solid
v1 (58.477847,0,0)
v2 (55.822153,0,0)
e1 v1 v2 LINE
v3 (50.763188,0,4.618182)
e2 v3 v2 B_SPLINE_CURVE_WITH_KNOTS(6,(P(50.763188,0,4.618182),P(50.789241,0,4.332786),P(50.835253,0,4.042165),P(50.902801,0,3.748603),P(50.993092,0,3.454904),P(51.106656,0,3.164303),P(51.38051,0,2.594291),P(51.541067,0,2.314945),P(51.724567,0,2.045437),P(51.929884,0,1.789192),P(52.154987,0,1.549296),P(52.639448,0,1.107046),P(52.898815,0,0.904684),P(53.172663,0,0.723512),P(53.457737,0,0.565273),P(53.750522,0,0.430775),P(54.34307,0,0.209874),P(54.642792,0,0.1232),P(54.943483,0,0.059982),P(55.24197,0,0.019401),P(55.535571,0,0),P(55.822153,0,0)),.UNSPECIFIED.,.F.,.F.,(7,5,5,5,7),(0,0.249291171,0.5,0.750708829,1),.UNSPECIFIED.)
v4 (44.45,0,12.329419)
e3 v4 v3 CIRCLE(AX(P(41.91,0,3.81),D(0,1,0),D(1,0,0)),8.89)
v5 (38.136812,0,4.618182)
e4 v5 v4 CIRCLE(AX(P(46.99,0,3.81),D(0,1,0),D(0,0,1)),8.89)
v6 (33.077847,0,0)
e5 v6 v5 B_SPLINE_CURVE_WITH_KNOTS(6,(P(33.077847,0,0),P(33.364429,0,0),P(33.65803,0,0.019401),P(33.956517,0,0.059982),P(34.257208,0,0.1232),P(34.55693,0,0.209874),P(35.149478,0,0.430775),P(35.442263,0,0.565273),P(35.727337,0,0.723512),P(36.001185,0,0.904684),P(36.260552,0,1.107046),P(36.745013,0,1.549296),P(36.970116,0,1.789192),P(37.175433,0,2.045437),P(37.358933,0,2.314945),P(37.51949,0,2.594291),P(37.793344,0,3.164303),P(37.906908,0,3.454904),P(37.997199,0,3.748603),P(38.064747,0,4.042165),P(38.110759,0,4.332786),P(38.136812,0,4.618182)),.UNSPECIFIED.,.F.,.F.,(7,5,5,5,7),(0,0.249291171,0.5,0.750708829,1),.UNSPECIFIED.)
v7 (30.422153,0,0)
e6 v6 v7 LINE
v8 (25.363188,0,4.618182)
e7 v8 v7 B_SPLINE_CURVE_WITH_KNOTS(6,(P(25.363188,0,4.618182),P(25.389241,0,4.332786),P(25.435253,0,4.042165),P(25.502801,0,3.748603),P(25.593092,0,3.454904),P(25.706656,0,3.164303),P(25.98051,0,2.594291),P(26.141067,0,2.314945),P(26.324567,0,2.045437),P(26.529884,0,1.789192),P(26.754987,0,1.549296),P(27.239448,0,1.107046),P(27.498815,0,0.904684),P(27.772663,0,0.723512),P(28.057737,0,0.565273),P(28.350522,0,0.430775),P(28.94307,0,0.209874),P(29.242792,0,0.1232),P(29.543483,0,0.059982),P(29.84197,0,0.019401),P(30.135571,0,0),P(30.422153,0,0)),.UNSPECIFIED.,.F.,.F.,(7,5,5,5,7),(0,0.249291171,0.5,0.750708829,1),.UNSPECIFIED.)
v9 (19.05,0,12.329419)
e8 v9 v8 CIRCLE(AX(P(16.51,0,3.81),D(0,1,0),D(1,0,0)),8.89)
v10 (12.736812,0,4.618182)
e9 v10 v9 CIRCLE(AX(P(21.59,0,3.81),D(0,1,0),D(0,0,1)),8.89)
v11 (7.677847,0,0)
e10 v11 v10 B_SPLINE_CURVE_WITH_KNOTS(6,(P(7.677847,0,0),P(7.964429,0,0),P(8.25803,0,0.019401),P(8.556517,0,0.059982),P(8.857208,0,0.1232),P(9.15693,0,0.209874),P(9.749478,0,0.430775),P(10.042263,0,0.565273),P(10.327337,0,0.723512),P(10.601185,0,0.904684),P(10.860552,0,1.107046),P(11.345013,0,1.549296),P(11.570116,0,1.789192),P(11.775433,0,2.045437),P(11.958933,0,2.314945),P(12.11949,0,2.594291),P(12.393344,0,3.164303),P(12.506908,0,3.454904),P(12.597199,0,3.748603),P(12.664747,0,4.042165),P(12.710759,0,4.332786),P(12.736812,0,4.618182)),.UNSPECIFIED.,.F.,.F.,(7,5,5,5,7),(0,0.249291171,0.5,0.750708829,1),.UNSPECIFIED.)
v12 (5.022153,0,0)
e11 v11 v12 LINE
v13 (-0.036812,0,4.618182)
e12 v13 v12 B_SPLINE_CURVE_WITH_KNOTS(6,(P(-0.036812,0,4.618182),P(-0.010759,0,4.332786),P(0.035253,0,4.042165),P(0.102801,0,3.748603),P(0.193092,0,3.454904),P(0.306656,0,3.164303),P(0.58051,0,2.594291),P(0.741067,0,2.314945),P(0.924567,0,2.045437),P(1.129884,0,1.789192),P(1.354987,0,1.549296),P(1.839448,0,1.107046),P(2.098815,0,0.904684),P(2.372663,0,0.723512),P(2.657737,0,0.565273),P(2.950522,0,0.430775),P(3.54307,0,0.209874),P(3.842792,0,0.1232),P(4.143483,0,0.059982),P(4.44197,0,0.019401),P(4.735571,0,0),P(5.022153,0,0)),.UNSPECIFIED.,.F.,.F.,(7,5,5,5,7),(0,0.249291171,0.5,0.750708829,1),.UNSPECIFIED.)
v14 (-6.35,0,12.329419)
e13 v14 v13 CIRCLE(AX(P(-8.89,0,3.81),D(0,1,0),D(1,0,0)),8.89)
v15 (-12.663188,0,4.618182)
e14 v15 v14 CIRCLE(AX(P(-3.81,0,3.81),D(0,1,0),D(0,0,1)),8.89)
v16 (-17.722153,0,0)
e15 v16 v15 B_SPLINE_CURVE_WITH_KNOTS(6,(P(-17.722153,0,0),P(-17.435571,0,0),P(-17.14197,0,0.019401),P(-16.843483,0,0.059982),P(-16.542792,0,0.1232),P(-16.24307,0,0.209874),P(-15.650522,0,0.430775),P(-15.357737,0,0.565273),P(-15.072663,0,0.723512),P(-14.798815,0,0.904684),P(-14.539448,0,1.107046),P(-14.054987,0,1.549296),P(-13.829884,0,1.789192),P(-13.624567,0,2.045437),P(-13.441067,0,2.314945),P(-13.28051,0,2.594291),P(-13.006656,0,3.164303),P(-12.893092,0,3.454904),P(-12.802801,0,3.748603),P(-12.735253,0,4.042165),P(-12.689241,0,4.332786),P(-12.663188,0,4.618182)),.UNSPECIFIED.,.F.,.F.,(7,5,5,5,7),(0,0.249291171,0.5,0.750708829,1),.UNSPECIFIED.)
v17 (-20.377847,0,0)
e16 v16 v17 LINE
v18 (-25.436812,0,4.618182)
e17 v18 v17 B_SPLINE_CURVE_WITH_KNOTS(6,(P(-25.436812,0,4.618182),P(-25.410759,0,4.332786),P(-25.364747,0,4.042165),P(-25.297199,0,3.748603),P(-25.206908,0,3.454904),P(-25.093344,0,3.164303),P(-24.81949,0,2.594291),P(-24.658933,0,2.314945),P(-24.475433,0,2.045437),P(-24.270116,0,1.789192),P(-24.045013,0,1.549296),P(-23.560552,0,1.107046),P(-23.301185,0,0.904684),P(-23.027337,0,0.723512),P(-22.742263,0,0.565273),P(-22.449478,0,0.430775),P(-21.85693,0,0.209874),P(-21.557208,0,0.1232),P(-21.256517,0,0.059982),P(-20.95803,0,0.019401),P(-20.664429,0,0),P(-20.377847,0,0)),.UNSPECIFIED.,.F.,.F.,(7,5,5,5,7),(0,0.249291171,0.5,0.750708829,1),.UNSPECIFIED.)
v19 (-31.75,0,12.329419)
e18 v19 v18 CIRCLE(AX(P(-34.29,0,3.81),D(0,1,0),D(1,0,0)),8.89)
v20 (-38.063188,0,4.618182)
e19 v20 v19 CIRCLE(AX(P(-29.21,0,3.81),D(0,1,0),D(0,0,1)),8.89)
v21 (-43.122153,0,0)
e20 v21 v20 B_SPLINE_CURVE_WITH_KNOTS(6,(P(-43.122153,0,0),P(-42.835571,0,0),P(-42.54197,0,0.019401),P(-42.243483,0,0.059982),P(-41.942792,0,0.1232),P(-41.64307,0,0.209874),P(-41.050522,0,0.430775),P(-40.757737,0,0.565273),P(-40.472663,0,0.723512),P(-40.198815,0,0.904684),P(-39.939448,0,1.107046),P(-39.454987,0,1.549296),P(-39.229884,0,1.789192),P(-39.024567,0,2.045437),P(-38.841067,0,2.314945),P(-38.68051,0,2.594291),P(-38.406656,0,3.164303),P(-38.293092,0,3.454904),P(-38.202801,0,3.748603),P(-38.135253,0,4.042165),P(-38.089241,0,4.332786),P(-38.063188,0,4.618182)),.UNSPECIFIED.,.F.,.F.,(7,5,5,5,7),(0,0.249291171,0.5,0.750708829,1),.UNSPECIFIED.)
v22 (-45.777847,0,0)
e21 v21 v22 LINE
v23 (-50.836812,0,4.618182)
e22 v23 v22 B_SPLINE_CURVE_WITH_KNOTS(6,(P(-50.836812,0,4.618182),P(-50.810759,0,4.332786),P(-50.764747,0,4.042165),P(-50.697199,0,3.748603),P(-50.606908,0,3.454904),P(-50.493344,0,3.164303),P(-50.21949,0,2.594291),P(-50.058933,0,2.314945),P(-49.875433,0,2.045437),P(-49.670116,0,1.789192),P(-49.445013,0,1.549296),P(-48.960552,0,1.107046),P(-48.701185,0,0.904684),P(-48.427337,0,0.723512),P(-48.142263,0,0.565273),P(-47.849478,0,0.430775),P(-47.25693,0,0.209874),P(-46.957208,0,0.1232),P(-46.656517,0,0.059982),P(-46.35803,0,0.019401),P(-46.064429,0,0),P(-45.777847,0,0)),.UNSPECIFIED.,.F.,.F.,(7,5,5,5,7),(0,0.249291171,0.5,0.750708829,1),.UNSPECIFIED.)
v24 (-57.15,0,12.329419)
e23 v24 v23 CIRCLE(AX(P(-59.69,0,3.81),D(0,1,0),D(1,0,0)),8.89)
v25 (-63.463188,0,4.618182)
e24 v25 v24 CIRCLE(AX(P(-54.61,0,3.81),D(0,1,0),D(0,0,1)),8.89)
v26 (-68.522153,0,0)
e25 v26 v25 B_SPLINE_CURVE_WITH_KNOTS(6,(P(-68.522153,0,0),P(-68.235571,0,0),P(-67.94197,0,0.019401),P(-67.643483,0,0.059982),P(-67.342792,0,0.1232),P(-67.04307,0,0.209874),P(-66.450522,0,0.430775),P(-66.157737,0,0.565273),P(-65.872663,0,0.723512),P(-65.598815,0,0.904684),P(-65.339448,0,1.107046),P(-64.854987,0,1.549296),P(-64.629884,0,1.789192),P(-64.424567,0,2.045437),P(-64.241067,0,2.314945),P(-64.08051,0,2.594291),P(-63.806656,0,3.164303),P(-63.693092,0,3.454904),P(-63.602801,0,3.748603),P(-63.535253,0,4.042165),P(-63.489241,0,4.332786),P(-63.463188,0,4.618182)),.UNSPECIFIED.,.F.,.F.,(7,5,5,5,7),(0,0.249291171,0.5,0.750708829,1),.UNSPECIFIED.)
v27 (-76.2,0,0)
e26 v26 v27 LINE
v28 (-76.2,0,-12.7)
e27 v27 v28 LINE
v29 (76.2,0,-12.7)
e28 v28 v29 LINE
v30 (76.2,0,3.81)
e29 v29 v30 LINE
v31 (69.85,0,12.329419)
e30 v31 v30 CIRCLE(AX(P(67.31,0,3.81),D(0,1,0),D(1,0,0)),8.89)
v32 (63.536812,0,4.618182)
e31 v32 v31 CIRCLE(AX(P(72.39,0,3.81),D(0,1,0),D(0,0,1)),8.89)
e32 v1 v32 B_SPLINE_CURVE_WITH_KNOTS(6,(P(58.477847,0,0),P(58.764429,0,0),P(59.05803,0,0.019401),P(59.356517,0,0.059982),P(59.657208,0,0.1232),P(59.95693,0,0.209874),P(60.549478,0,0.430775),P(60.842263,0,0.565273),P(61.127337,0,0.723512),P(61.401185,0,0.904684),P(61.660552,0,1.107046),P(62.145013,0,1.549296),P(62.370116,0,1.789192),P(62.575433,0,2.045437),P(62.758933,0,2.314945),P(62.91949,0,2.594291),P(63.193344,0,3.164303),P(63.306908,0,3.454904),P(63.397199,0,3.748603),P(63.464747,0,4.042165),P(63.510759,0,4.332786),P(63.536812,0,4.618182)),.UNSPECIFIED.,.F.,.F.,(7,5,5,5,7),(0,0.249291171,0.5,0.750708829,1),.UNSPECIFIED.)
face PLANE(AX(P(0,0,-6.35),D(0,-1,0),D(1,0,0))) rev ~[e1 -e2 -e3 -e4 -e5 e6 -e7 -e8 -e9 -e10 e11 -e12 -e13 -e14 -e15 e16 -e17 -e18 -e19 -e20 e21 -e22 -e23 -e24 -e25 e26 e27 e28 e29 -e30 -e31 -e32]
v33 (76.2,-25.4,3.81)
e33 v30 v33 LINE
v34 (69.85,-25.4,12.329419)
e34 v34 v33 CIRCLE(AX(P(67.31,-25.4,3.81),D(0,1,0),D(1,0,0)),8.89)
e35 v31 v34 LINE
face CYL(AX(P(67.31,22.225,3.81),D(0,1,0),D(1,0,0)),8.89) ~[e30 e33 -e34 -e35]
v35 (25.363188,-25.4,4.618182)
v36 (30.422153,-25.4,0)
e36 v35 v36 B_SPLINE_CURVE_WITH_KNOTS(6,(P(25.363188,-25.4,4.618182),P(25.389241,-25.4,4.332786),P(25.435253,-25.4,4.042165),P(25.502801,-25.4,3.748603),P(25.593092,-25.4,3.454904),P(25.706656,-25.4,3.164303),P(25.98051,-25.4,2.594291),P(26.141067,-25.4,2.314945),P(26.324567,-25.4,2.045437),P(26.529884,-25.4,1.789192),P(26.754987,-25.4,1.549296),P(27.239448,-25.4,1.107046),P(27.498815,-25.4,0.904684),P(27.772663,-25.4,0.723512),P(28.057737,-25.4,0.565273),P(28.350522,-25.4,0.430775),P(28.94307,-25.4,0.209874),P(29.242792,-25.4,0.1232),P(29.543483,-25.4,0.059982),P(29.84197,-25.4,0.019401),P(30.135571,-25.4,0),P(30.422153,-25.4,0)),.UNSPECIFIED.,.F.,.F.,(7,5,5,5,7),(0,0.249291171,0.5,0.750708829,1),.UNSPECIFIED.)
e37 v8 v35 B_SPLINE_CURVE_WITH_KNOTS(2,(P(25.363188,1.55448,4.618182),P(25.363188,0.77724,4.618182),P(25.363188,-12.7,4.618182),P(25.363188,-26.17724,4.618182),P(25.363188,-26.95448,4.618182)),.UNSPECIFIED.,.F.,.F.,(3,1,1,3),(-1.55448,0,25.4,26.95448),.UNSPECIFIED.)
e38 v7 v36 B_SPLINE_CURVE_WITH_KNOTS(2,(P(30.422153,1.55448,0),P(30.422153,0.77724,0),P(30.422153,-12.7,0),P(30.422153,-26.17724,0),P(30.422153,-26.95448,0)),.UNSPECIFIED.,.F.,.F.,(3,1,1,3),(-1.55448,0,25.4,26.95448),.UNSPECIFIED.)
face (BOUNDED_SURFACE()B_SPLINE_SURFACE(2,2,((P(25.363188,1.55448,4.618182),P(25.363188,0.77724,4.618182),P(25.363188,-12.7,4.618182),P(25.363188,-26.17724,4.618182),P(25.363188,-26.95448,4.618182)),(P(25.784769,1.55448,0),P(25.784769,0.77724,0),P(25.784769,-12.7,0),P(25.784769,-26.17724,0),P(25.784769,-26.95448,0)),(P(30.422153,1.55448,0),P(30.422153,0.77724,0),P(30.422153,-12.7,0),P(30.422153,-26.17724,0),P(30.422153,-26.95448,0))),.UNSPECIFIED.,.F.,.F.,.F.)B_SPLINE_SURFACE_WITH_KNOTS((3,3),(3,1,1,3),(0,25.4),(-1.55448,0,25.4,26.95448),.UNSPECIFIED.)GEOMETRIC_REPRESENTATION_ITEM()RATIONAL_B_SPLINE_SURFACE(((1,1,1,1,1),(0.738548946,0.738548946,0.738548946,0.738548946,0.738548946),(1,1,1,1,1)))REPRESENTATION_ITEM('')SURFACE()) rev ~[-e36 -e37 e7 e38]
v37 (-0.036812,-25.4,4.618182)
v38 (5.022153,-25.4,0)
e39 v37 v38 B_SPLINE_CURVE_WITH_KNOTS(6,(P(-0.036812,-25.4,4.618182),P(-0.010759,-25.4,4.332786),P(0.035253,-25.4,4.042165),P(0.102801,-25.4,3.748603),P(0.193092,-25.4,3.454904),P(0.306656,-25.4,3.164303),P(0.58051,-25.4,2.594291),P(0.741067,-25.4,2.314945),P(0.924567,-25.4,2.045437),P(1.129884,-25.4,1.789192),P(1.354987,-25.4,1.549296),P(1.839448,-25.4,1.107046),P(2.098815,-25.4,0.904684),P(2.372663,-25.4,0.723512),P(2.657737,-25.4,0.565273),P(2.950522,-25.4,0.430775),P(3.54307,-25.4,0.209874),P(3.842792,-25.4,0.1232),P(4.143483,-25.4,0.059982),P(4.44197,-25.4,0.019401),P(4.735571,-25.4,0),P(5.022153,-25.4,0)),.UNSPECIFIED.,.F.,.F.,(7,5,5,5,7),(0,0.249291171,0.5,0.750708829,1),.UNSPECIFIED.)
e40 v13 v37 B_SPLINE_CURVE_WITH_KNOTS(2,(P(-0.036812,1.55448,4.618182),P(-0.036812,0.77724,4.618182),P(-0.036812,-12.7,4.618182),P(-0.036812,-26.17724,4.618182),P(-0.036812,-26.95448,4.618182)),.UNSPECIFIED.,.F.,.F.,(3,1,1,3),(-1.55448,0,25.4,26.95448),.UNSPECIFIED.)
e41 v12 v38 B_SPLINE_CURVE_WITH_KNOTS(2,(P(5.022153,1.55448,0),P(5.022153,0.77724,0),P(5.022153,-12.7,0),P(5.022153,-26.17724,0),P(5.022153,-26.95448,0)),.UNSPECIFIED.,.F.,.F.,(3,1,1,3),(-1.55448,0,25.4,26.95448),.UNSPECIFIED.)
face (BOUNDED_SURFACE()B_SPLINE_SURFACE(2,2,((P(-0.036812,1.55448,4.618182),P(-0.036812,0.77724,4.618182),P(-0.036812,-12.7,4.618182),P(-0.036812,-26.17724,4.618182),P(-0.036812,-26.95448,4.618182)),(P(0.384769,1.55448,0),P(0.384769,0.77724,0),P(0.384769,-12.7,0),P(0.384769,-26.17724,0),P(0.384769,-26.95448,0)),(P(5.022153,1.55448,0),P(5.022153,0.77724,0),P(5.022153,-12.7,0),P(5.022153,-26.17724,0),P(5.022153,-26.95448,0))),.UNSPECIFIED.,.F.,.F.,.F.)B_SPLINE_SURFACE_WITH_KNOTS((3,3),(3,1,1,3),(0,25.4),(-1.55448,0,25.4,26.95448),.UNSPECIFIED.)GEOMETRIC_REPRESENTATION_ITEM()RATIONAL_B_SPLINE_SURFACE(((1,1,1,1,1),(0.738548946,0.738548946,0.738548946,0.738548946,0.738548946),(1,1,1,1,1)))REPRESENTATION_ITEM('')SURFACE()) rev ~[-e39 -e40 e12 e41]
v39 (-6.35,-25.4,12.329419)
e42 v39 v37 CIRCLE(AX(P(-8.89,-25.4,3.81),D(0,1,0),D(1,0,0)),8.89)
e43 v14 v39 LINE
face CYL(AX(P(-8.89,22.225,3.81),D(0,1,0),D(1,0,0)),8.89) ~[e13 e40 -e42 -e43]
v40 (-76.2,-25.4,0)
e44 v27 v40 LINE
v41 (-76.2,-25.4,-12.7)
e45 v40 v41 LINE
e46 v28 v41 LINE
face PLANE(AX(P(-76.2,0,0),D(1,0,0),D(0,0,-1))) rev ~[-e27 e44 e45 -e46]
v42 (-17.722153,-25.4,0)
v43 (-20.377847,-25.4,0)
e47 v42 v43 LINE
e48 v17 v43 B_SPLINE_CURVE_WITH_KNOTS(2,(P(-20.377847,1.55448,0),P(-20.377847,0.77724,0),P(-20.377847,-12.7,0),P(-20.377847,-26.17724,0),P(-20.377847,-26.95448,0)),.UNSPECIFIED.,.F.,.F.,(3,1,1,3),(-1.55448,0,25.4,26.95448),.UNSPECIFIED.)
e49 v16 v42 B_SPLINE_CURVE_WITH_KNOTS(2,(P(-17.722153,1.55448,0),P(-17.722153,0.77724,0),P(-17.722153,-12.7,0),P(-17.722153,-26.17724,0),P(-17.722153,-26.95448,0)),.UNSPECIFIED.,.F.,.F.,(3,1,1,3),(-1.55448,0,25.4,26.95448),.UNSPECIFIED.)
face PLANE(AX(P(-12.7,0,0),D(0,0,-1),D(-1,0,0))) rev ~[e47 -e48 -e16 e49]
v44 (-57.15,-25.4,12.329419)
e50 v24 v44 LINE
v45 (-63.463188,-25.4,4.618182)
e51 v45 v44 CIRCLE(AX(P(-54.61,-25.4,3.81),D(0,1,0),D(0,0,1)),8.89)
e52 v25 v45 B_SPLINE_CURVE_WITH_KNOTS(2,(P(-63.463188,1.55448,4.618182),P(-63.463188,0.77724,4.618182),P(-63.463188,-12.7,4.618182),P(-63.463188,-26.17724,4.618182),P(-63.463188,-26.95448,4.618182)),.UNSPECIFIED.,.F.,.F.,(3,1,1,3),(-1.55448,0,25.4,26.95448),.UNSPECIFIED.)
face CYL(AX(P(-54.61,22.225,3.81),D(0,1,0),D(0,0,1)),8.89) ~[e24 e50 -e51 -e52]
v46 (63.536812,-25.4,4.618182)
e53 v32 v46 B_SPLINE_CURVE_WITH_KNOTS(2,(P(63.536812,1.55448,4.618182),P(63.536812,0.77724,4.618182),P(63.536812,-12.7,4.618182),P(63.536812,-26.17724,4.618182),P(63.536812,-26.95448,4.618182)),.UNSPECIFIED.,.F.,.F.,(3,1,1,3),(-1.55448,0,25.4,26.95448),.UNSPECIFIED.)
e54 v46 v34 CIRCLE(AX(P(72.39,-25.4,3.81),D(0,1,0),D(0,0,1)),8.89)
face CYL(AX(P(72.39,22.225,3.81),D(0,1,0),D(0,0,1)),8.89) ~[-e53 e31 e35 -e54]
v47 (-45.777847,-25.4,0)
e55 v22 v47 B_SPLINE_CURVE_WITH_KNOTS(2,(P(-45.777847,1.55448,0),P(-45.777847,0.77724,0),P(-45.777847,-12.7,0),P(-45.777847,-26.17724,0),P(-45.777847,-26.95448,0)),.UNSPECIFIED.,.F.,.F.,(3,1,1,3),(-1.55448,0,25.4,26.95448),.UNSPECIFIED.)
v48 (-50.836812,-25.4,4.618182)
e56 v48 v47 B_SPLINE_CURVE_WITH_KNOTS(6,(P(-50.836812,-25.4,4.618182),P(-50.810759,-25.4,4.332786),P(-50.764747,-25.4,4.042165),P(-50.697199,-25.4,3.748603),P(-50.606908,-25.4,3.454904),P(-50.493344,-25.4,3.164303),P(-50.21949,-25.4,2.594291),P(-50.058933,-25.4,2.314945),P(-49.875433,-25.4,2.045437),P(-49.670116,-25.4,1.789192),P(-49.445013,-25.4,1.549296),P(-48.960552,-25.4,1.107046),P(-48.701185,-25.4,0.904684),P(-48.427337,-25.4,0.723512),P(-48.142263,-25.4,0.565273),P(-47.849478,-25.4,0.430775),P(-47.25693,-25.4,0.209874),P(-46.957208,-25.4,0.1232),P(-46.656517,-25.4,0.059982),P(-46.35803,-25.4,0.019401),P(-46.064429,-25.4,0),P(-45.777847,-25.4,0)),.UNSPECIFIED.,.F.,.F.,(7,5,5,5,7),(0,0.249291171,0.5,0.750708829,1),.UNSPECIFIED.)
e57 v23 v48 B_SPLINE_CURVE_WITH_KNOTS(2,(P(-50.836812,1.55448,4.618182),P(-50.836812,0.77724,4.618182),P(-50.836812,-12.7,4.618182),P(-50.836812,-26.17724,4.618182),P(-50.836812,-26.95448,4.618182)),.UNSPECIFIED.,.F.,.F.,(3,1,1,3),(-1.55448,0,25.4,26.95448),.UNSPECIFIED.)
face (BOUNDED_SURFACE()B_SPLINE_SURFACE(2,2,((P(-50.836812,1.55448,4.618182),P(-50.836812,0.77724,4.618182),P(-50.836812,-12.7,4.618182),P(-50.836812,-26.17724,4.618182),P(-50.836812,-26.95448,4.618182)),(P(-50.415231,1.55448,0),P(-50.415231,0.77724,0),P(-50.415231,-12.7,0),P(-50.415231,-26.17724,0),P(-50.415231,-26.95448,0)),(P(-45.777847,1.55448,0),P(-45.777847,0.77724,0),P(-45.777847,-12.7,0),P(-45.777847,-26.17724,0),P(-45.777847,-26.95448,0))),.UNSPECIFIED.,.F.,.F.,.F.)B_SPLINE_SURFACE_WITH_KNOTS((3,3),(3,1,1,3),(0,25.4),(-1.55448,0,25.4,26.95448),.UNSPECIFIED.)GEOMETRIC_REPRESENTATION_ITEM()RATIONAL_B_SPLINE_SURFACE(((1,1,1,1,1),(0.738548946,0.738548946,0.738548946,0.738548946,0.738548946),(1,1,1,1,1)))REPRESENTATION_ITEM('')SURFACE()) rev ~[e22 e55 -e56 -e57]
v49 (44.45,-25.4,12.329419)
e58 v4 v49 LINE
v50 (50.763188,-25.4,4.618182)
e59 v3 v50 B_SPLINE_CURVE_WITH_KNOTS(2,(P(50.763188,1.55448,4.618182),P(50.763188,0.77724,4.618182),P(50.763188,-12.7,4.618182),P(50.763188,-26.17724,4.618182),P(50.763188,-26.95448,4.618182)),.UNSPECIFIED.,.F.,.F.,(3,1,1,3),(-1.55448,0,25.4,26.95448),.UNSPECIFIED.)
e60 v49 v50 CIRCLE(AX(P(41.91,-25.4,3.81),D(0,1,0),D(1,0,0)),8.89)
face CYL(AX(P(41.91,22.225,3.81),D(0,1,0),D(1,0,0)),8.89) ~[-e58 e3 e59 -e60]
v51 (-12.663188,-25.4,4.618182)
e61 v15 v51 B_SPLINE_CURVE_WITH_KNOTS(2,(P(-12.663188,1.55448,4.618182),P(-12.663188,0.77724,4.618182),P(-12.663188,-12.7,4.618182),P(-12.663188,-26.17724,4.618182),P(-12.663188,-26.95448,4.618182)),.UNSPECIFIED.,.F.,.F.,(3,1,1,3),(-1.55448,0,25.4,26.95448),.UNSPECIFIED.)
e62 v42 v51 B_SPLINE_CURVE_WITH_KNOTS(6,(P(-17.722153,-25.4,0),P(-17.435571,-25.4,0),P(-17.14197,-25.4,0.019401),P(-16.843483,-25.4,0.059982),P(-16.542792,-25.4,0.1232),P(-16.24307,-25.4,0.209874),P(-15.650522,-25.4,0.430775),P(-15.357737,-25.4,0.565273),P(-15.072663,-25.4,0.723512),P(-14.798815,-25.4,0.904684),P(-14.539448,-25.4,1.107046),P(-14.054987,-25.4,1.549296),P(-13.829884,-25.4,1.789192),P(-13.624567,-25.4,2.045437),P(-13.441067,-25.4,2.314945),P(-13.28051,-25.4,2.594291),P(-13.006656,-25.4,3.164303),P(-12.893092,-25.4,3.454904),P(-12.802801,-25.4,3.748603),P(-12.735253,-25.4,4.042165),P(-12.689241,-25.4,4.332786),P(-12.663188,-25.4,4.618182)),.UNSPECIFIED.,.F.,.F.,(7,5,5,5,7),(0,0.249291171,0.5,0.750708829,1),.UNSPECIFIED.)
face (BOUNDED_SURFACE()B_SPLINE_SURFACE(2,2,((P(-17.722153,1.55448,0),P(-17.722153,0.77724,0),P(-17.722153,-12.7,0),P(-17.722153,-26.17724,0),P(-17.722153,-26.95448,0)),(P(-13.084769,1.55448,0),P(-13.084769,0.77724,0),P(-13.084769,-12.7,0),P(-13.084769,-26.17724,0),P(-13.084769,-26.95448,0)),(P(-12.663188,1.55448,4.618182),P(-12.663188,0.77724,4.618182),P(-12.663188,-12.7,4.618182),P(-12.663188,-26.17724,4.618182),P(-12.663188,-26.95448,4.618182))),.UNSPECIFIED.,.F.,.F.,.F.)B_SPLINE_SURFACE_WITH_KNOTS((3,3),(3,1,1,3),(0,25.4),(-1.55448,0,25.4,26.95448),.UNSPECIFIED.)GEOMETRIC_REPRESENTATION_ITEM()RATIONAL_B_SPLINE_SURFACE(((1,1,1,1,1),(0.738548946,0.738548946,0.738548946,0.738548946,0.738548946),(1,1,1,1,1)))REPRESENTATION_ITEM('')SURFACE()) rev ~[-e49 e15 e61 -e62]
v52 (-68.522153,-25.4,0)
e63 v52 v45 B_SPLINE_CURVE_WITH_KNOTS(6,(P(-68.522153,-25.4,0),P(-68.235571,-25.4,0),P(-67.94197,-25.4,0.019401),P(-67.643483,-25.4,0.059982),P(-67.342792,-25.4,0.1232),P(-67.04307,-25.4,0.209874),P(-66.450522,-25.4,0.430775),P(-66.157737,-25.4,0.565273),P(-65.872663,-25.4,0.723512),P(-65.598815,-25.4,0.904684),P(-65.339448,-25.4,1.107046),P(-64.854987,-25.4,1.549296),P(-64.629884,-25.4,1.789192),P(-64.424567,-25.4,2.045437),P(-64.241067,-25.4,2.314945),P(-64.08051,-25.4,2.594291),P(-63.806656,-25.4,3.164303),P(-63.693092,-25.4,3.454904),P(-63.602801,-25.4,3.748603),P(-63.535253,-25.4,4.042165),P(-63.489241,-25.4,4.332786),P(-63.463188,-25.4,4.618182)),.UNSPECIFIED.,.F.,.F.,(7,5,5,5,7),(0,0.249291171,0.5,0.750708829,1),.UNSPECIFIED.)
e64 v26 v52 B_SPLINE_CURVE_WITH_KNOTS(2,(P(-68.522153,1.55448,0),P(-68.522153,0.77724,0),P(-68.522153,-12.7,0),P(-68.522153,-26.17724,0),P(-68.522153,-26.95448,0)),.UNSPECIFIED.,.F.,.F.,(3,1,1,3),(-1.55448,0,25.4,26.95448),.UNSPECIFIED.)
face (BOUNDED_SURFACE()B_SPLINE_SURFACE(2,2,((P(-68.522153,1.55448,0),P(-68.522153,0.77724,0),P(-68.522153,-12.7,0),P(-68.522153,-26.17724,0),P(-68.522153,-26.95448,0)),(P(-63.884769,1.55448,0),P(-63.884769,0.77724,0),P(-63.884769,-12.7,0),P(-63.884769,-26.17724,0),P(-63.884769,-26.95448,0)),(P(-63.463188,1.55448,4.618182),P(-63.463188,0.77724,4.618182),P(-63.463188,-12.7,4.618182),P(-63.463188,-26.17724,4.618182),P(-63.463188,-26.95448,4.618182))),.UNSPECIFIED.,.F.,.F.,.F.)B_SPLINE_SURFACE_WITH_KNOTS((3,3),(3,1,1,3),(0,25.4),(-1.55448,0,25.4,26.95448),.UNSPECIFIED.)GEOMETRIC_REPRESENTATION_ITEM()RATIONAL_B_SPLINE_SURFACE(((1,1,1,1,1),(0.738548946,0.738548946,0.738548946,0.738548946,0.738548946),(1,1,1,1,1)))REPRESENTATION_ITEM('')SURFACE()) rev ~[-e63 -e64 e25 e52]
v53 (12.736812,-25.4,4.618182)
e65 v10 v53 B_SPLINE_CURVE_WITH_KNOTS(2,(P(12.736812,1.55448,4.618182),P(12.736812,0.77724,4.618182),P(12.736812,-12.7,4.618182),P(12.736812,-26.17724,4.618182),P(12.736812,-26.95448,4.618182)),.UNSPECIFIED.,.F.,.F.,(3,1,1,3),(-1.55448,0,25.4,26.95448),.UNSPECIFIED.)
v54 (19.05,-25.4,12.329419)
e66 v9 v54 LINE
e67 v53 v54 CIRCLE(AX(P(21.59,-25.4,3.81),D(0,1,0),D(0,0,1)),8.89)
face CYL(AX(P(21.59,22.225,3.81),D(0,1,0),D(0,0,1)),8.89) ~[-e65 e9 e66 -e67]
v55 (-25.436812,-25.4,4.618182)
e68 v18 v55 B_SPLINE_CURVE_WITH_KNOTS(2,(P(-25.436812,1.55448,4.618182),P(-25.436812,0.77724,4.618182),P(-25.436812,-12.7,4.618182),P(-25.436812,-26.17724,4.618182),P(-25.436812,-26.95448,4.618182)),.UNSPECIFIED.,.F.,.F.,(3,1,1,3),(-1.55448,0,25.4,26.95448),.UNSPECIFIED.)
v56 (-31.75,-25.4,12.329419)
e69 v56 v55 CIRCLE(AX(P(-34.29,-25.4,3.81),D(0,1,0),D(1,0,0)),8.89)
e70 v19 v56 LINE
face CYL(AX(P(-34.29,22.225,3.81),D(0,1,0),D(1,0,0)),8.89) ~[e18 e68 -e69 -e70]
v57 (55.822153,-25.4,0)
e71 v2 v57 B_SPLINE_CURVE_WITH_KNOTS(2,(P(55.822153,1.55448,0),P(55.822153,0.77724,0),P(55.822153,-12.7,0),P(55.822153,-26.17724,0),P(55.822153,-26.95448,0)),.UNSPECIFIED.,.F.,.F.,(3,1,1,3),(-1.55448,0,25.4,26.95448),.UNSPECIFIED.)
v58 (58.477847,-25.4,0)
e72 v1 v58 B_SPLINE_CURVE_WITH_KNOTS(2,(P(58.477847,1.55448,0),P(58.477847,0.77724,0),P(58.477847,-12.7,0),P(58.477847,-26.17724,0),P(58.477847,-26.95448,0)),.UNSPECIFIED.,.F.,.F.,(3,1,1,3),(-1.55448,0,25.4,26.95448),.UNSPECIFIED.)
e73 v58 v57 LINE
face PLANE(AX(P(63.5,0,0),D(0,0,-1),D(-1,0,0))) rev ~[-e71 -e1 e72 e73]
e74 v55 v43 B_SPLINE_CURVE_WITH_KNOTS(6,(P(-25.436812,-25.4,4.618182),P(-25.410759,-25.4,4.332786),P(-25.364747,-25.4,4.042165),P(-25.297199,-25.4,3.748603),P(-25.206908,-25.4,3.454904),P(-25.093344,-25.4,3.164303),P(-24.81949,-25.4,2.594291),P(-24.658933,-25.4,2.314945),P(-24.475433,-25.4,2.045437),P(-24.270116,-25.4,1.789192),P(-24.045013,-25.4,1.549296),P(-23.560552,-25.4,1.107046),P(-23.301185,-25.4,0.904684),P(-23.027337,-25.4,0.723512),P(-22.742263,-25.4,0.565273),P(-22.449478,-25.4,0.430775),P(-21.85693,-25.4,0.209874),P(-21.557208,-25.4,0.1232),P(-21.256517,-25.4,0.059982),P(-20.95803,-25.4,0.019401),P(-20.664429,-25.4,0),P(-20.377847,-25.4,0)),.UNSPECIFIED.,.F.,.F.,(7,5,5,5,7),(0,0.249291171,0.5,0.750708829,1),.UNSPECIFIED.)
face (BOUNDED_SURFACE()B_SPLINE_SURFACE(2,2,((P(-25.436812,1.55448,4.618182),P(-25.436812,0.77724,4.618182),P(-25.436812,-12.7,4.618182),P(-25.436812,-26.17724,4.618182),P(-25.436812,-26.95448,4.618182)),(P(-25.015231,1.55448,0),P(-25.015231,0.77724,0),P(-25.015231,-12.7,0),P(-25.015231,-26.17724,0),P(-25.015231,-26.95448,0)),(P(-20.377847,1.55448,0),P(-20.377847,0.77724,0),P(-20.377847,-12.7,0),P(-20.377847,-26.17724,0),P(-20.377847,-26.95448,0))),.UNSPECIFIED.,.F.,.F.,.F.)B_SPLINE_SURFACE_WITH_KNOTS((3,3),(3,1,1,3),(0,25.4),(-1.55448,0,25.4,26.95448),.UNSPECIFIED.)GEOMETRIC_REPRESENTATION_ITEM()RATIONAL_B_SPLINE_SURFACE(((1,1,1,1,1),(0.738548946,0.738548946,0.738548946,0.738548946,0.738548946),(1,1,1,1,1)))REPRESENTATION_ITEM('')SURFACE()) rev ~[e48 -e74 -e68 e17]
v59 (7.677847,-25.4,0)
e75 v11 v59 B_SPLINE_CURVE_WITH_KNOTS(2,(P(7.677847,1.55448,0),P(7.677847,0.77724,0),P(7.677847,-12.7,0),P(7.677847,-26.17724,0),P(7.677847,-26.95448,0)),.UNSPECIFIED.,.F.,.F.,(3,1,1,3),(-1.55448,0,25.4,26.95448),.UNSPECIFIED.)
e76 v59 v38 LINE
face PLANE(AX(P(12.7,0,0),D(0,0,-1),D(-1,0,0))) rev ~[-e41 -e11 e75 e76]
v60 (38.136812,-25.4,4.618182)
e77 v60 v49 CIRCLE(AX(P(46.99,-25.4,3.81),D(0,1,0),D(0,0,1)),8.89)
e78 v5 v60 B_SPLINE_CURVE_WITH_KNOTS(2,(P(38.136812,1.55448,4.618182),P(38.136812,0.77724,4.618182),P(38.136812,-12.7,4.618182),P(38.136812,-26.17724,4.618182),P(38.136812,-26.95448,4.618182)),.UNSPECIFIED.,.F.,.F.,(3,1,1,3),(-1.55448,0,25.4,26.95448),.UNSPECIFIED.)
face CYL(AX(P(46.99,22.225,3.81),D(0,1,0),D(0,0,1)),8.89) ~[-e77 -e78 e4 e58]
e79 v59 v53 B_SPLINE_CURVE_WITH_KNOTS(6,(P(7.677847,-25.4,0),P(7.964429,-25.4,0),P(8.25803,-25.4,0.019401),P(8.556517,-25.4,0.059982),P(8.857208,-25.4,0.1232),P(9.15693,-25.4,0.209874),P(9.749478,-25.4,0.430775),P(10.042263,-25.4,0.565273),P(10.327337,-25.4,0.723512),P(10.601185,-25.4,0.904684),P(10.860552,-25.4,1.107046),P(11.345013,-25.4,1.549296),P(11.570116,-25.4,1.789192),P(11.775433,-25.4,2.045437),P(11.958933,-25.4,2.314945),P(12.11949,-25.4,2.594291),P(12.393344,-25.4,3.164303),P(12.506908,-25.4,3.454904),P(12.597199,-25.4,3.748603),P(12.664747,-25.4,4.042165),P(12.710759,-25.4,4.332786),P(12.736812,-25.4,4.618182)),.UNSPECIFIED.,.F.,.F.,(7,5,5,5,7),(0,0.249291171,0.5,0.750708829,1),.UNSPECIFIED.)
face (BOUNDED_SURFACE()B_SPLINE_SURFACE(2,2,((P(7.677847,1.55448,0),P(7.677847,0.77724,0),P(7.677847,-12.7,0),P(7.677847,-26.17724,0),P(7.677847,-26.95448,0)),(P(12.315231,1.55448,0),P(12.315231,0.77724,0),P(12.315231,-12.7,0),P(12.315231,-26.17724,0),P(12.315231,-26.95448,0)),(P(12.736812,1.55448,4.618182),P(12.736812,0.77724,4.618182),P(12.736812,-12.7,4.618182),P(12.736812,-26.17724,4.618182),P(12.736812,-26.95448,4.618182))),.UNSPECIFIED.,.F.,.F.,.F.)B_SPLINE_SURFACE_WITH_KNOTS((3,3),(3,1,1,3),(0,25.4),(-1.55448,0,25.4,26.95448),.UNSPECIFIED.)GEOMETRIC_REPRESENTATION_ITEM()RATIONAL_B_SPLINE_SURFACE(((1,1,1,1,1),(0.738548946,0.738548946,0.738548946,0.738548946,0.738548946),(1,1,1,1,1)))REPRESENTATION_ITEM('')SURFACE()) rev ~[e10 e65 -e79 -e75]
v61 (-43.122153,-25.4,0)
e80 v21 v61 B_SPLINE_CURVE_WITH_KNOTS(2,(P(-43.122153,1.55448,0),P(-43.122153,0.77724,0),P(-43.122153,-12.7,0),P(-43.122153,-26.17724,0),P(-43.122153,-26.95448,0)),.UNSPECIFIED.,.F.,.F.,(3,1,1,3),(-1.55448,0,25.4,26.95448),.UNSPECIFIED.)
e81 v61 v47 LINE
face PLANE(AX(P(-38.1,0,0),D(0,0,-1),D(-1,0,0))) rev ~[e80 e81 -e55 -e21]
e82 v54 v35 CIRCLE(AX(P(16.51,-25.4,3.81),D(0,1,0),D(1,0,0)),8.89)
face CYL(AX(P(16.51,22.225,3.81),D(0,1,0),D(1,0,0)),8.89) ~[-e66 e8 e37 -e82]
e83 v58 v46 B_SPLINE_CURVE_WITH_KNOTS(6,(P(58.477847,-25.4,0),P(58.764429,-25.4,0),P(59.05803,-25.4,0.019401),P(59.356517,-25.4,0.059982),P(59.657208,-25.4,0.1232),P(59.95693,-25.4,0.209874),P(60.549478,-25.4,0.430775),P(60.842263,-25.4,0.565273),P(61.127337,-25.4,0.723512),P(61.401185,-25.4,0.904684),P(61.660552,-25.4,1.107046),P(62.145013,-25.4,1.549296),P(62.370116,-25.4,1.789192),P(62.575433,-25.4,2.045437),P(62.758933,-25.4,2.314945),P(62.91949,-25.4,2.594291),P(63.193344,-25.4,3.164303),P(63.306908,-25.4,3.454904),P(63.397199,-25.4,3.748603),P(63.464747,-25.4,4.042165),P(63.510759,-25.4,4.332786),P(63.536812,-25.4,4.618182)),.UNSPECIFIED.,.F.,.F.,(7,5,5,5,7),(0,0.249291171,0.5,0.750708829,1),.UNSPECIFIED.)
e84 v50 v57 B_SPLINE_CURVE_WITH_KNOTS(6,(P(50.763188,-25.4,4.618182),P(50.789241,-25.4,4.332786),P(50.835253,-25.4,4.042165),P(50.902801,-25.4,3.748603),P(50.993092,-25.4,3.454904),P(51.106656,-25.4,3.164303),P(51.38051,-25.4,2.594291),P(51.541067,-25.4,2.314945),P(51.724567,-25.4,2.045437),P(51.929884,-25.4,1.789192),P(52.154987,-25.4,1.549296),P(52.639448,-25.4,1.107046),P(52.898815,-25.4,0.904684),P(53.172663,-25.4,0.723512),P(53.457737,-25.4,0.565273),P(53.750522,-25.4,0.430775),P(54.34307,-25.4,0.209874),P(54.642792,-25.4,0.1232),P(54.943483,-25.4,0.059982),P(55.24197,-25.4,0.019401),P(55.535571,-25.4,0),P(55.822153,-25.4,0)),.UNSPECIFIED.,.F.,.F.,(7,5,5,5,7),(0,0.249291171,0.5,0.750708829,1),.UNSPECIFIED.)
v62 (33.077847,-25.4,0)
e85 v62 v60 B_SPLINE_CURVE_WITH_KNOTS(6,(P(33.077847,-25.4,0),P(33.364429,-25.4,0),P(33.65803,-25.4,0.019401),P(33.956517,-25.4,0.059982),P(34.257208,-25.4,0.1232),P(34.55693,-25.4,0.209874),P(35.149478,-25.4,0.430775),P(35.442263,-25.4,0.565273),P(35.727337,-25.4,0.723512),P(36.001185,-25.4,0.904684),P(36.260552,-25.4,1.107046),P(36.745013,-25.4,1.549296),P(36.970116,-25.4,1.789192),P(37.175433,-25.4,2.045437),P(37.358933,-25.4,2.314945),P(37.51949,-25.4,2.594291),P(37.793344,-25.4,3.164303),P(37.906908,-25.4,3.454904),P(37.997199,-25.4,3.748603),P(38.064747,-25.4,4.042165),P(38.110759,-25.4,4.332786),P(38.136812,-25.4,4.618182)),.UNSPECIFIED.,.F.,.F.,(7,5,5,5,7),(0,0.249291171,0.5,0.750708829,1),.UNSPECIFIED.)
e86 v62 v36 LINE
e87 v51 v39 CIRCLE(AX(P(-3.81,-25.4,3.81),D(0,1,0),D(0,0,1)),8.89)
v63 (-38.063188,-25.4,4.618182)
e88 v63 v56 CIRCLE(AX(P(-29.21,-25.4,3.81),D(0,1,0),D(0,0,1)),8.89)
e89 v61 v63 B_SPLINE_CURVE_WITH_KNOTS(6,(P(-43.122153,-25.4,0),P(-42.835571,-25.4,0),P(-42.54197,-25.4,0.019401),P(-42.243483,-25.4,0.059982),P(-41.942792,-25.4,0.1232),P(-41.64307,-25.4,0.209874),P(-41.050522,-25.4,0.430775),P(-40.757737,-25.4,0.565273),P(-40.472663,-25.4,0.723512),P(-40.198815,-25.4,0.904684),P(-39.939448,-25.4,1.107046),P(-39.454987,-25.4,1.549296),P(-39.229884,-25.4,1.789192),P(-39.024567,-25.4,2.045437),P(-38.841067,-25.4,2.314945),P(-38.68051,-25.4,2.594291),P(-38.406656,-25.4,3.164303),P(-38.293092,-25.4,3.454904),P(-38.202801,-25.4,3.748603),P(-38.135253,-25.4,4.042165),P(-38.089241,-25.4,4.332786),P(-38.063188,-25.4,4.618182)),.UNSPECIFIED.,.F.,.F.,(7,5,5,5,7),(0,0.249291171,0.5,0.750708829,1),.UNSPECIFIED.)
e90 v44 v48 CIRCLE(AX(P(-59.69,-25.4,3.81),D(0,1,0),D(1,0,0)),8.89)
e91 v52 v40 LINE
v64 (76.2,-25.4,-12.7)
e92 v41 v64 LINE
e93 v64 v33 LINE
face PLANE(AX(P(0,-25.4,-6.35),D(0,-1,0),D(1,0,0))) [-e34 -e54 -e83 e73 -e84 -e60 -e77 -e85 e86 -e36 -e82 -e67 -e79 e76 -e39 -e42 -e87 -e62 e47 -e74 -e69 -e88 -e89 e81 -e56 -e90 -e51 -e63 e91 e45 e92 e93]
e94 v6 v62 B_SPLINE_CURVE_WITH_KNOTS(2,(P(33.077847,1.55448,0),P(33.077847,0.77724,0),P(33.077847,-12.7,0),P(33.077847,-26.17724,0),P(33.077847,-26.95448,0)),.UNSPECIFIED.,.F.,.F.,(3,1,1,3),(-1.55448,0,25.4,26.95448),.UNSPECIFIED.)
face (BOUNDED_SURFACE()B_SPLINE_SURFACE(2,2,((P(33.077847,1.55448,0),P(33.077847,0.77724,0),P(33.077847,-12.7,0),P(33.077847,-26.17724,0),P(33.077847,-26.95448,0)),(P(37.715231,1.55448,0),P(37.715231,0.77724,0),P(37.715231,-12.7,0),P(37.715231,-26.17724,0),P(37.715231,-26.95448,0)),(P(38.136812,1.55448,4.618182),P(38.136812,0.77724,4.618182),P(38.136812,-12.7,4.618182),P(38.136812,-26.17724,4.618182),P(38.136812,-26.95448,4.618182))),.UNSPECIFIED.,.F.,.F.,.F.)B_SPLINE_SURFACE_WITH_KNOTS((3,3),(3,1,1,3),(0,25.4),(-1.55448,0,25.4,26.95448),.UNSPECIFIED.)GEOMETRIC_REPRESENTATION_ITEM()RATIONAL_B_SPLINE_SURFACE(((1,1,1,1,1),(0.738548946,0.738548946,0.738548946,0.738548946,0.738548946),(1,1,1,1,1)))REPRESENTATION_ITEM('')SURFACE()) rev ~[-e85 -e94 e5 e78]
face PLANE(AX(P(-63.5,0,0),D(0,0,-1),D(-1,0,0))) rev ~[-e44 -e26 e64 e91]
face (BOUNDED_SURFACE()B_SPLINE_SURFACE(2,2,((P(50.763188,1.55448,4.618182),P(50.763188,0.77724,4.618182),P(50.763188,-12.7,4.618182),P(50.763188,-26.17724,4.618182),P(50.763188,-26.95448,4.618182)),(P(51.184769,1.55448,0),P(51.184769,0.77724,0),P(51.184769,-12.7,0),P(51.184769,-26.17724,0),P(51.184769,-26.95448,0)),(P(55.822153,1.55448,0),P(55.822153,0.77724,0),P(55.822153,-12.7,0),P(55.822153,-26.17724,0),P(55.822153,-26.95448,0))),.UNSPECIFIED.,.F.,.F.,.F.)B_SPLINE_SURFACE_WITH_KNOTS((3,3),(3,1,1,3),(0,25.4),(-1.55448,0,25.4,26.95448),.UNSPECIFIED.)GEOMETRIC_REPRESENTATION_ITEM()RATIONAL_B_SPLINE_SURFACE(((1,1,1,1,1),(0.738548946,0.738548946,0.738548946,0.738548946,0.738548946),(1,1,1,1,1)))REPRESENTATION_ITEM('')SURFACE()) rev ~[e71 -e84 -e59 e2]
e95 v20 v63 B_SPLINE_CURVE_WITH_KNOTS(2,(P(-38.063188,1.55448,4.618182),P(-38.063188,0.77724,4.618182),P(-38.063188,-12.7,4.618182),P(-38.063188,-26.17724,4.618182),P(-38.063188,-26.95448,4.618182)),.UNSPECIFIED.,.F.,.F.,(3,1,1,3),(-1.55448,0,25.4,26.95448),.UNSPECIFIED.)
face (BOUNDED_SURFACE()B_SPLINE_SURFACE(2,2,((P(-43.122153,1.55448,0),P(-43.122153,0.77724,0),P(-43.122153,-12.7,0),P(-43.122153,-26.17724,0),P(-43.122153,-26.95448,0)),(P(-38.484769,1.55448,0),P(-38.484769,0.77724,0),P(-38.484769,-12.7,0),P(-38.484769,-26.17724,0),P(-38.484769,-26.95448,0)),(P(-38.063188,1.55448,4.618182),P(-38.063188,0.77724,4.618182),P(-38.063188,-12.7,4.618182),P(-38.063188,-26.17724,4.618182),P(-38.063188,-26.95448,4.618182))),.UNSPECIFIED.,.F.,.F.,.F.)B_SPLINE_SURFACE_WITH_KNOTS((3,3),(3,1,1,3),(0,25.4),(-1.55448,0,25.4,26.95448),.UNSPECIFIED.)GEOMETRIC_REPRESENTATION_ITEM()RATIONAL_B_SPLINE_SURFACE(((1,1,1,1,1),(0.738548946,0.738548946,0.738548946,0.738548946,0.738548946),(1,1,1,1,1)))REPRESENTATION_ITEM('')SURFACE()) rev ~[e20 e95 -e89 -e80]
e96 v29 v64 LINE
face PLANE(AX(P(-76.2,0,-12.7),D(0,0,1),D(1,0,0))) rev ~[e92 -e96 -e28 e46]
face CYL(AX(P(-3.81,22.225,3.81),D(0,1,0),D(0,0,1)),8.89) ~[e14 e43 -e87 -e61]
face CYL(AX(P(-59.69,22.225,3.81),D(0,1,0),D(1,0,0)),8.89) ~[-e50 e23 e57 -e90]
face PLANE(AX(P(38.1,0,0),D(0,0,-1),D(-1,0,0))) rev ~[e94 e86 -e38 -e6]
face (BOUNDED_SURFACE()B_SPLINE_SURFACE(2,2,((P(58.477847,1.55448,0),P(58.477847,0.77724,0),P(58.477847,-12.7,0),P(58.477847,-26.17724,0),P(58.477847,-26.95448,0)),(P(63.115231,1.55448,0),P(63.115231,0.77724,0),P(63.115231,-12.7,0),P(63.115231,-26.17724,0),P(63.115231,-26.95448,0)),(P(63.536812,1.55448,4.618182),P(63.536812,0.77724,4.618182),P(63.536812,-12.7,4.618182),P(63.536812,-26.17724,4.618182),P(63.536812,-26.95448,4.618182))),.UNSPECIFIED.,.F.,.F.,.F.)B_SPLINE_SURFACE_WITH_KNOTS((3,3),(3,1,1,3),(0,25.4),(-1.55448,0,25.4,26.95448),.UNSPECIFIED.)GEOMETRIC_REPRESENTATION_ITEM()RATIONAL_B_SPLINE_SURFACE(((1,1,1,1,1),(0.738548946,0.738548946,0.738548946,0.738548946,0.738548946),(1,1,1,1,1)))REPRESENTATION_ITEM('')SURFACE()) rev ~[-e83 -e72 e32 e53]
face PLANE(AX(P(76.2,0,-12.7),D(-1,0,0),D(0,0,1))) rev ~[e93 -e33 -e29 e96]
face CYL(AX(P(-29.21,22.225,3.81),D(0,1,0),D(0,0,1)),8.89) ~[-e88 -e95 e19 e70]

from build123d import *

# Parameters (mm, degrees)
F0_W        = 12.7
F0_H        = 12.7
F1_DEPTH    = 25.4
F2_T1_DEPTH = 69.85
F3_R        = 5.08


# Not quite as in the source:
# - a fillet or chamfer that OpenCascade refuses, or shapes differently, is made with other operations: its cross-section is extruded or revolved along the edge and cut away or added


with BuildPart() as f1:
    # F0 (on Front) → F1 (new body)
    with BuildSketch(Plane.XZ):
        Polygon((12.7, 0), (0, 0), (-12.7, 0), (-25.4, 0), (-38.1, 0), (-50.8, 0), (-63.5, 0), (-76.2, 0), (-76.2, -12.7), (0, -12.7), (76.2, -12.7), (76.2, 0), (63.5, 0), (50.8, 0), (38.1, 0), (25.4, 0), align=None)
        with Locations((-6.35, 6.35)):
            Rectangle(F0_W, F0_H)
        with Locations((19.05, 6.35)):
            Rectangle(F0_W, F0_H)
        with Locations((-31.75, 6.35)):
            Rectangle(F0_W, F0_H)
        with Locations((44.45, 6.35)):
            Rectangle(F0_W, F0_H)
        with Locations((-57.15, 6.35)):
            Rectangle(F0_W, F0_H)
        with Locations((69.85, 6.35)):
            Rectangle(F0_W, F0_H)
    extrude(amount=F1_DEPTH)

    # F2: fillet of radius 8.89 on 12 edges, made by hand

    # F2_s2 → F2_t1 (cut)
    with BuildSketch(Plane.XZ.offset(-22.225)):
        with BuildLine():
            ThreePointArc((-54.61, 12.7), (-60.8961792847, 10.0961792847), (-63.5, 3.81))
            Line((-63.5, 3.81), (-63.5, 12.7))
            Line((-63.5, 12.7), (-54.61, 12.7))
        make_face()
        with BuildLine():
            ThreePointArc((-50.8, 3.81), (-53.4038207153, 10.0961792847), (-59.69, 12.7))
            Line((-59.69, 12.7), (-50.8, 12.7))
            Line((-50.8, 12.7), (-50.8, 3.81))
        make_face()
        with BuildLine():
            ThreePointArc((-29.21, 12.7), (-35.4961792847, 10.0961792847), (-38.1, 3.81))
            Line((-38.1, 3.81), (-38.1, 12.7))
            Line((-38.1, 12.7), (-29.21, 12.7))
        make_face()
        with BuildLine():
            ThreePointArc((-25.4, 3.81), (-28.0038207153, 10.0961792847), (-34.29, 12.7))
            Line((-34.29, 12.7), (-25.4, 12.7))
            Line((-25.4, 12.7), (-25.4, 3.81))
        make_face()
        with BuildLine():
            ThreePointArc((-3.81, 12.7), (-10.0961792847, 10.0961792847), (-12.7, 3.81))
            Line((-12.7, 3.81), (-12.7, 12.7))
            Line((-12.7, 12.7), (-3.81, 12.7))
        make_face()
        with BuildLine():
            ThreePointArc((0, 3.81), (-2.6038207153, 10.0961792847), (-8.89, 12.7))
            Line((-8.89, 12.7), (0, 12.7))
            Line((0, 12.7), (0, 3.81))
        make_face()
        with BuildLine():
            ThreePointArc((21.59, 12.7), (15.3038207153, 10.0961792847), (12.7, 3.81))
            Line((12.7, 3.81), (12.7, 12.7))
            Line((12.7, 12.7), (21.59, 12.7))
        make_face()
        with BuildLine():
            ThreePointArc((25.4, 3.81), (22.7961792847, 10.0961792847), (16.51, 12.7))
            Line((16.51, 12.7), (25.4, 12.7))
            Line((25.4, 12.7), (25.4, 3.81))
        make_face()
        with BuildLine():
            ThreePointArc((46.99, 12.7), (40.7038207153, 10.0961792847), (38.1, 3.81))
            Line((38.1, 3.81), (38.1, 12.7))
            Line((38.1, 12.7), (46.99, 12.7))
        make_face()
        with BuildLine():
            ThreePointArc((50.8, 3.81), (48.1961792847, 10.0961792847), (41.91, 12.7))
            Line((41.91, 12.7), (50.8, 12.7))
            Line((50.8, 12.7), (50.8, 3.81))
        make_face()
        with BuildLine():
            ThreePointArc((76.2, 3.81), (73.5961792847, 10.0961792847), (67.31, 12.7))
            Line((67.31, 12.7), (76.2, 12.7))
            Line((76.2, 12.7), (76.2, 3.81))
        make_face()
        with BuildLine():
            ThreePointArc((72.39, 12.7), (66.1038207153, 10.0961792847), (63.5, 3.81))
            Line((63.5, 3.81), (63.5, 12.7))
            Line((63.5, 12.7), (72.39, 12.7))
        make_face()
    extrude(amount=F2_T1_DEPTH, mode=Mode.SUBTRACT)

    # F3
    f3_edges = [f1.edges().sort_by_distance(p)[0] for p in [
        (-63.5, -12.7, 0),
        (-50.8, -12.7, 0),
        (-38.1, -12.7, 0),
        (-25.4, -12.7, 0),
        (-12.7, -12.7, 0),
        (0, -12.7, 0),
        (12.7, -12.7, 0),
        (38.1, -12.7, 0),
        (63.5, -12.7, 0),
        (50.8, -12.7, 0),
        (25.4, -12.7, 0),
    ]]
    fillet(f3_edges, radius=F3_R)


solid = f1.part
